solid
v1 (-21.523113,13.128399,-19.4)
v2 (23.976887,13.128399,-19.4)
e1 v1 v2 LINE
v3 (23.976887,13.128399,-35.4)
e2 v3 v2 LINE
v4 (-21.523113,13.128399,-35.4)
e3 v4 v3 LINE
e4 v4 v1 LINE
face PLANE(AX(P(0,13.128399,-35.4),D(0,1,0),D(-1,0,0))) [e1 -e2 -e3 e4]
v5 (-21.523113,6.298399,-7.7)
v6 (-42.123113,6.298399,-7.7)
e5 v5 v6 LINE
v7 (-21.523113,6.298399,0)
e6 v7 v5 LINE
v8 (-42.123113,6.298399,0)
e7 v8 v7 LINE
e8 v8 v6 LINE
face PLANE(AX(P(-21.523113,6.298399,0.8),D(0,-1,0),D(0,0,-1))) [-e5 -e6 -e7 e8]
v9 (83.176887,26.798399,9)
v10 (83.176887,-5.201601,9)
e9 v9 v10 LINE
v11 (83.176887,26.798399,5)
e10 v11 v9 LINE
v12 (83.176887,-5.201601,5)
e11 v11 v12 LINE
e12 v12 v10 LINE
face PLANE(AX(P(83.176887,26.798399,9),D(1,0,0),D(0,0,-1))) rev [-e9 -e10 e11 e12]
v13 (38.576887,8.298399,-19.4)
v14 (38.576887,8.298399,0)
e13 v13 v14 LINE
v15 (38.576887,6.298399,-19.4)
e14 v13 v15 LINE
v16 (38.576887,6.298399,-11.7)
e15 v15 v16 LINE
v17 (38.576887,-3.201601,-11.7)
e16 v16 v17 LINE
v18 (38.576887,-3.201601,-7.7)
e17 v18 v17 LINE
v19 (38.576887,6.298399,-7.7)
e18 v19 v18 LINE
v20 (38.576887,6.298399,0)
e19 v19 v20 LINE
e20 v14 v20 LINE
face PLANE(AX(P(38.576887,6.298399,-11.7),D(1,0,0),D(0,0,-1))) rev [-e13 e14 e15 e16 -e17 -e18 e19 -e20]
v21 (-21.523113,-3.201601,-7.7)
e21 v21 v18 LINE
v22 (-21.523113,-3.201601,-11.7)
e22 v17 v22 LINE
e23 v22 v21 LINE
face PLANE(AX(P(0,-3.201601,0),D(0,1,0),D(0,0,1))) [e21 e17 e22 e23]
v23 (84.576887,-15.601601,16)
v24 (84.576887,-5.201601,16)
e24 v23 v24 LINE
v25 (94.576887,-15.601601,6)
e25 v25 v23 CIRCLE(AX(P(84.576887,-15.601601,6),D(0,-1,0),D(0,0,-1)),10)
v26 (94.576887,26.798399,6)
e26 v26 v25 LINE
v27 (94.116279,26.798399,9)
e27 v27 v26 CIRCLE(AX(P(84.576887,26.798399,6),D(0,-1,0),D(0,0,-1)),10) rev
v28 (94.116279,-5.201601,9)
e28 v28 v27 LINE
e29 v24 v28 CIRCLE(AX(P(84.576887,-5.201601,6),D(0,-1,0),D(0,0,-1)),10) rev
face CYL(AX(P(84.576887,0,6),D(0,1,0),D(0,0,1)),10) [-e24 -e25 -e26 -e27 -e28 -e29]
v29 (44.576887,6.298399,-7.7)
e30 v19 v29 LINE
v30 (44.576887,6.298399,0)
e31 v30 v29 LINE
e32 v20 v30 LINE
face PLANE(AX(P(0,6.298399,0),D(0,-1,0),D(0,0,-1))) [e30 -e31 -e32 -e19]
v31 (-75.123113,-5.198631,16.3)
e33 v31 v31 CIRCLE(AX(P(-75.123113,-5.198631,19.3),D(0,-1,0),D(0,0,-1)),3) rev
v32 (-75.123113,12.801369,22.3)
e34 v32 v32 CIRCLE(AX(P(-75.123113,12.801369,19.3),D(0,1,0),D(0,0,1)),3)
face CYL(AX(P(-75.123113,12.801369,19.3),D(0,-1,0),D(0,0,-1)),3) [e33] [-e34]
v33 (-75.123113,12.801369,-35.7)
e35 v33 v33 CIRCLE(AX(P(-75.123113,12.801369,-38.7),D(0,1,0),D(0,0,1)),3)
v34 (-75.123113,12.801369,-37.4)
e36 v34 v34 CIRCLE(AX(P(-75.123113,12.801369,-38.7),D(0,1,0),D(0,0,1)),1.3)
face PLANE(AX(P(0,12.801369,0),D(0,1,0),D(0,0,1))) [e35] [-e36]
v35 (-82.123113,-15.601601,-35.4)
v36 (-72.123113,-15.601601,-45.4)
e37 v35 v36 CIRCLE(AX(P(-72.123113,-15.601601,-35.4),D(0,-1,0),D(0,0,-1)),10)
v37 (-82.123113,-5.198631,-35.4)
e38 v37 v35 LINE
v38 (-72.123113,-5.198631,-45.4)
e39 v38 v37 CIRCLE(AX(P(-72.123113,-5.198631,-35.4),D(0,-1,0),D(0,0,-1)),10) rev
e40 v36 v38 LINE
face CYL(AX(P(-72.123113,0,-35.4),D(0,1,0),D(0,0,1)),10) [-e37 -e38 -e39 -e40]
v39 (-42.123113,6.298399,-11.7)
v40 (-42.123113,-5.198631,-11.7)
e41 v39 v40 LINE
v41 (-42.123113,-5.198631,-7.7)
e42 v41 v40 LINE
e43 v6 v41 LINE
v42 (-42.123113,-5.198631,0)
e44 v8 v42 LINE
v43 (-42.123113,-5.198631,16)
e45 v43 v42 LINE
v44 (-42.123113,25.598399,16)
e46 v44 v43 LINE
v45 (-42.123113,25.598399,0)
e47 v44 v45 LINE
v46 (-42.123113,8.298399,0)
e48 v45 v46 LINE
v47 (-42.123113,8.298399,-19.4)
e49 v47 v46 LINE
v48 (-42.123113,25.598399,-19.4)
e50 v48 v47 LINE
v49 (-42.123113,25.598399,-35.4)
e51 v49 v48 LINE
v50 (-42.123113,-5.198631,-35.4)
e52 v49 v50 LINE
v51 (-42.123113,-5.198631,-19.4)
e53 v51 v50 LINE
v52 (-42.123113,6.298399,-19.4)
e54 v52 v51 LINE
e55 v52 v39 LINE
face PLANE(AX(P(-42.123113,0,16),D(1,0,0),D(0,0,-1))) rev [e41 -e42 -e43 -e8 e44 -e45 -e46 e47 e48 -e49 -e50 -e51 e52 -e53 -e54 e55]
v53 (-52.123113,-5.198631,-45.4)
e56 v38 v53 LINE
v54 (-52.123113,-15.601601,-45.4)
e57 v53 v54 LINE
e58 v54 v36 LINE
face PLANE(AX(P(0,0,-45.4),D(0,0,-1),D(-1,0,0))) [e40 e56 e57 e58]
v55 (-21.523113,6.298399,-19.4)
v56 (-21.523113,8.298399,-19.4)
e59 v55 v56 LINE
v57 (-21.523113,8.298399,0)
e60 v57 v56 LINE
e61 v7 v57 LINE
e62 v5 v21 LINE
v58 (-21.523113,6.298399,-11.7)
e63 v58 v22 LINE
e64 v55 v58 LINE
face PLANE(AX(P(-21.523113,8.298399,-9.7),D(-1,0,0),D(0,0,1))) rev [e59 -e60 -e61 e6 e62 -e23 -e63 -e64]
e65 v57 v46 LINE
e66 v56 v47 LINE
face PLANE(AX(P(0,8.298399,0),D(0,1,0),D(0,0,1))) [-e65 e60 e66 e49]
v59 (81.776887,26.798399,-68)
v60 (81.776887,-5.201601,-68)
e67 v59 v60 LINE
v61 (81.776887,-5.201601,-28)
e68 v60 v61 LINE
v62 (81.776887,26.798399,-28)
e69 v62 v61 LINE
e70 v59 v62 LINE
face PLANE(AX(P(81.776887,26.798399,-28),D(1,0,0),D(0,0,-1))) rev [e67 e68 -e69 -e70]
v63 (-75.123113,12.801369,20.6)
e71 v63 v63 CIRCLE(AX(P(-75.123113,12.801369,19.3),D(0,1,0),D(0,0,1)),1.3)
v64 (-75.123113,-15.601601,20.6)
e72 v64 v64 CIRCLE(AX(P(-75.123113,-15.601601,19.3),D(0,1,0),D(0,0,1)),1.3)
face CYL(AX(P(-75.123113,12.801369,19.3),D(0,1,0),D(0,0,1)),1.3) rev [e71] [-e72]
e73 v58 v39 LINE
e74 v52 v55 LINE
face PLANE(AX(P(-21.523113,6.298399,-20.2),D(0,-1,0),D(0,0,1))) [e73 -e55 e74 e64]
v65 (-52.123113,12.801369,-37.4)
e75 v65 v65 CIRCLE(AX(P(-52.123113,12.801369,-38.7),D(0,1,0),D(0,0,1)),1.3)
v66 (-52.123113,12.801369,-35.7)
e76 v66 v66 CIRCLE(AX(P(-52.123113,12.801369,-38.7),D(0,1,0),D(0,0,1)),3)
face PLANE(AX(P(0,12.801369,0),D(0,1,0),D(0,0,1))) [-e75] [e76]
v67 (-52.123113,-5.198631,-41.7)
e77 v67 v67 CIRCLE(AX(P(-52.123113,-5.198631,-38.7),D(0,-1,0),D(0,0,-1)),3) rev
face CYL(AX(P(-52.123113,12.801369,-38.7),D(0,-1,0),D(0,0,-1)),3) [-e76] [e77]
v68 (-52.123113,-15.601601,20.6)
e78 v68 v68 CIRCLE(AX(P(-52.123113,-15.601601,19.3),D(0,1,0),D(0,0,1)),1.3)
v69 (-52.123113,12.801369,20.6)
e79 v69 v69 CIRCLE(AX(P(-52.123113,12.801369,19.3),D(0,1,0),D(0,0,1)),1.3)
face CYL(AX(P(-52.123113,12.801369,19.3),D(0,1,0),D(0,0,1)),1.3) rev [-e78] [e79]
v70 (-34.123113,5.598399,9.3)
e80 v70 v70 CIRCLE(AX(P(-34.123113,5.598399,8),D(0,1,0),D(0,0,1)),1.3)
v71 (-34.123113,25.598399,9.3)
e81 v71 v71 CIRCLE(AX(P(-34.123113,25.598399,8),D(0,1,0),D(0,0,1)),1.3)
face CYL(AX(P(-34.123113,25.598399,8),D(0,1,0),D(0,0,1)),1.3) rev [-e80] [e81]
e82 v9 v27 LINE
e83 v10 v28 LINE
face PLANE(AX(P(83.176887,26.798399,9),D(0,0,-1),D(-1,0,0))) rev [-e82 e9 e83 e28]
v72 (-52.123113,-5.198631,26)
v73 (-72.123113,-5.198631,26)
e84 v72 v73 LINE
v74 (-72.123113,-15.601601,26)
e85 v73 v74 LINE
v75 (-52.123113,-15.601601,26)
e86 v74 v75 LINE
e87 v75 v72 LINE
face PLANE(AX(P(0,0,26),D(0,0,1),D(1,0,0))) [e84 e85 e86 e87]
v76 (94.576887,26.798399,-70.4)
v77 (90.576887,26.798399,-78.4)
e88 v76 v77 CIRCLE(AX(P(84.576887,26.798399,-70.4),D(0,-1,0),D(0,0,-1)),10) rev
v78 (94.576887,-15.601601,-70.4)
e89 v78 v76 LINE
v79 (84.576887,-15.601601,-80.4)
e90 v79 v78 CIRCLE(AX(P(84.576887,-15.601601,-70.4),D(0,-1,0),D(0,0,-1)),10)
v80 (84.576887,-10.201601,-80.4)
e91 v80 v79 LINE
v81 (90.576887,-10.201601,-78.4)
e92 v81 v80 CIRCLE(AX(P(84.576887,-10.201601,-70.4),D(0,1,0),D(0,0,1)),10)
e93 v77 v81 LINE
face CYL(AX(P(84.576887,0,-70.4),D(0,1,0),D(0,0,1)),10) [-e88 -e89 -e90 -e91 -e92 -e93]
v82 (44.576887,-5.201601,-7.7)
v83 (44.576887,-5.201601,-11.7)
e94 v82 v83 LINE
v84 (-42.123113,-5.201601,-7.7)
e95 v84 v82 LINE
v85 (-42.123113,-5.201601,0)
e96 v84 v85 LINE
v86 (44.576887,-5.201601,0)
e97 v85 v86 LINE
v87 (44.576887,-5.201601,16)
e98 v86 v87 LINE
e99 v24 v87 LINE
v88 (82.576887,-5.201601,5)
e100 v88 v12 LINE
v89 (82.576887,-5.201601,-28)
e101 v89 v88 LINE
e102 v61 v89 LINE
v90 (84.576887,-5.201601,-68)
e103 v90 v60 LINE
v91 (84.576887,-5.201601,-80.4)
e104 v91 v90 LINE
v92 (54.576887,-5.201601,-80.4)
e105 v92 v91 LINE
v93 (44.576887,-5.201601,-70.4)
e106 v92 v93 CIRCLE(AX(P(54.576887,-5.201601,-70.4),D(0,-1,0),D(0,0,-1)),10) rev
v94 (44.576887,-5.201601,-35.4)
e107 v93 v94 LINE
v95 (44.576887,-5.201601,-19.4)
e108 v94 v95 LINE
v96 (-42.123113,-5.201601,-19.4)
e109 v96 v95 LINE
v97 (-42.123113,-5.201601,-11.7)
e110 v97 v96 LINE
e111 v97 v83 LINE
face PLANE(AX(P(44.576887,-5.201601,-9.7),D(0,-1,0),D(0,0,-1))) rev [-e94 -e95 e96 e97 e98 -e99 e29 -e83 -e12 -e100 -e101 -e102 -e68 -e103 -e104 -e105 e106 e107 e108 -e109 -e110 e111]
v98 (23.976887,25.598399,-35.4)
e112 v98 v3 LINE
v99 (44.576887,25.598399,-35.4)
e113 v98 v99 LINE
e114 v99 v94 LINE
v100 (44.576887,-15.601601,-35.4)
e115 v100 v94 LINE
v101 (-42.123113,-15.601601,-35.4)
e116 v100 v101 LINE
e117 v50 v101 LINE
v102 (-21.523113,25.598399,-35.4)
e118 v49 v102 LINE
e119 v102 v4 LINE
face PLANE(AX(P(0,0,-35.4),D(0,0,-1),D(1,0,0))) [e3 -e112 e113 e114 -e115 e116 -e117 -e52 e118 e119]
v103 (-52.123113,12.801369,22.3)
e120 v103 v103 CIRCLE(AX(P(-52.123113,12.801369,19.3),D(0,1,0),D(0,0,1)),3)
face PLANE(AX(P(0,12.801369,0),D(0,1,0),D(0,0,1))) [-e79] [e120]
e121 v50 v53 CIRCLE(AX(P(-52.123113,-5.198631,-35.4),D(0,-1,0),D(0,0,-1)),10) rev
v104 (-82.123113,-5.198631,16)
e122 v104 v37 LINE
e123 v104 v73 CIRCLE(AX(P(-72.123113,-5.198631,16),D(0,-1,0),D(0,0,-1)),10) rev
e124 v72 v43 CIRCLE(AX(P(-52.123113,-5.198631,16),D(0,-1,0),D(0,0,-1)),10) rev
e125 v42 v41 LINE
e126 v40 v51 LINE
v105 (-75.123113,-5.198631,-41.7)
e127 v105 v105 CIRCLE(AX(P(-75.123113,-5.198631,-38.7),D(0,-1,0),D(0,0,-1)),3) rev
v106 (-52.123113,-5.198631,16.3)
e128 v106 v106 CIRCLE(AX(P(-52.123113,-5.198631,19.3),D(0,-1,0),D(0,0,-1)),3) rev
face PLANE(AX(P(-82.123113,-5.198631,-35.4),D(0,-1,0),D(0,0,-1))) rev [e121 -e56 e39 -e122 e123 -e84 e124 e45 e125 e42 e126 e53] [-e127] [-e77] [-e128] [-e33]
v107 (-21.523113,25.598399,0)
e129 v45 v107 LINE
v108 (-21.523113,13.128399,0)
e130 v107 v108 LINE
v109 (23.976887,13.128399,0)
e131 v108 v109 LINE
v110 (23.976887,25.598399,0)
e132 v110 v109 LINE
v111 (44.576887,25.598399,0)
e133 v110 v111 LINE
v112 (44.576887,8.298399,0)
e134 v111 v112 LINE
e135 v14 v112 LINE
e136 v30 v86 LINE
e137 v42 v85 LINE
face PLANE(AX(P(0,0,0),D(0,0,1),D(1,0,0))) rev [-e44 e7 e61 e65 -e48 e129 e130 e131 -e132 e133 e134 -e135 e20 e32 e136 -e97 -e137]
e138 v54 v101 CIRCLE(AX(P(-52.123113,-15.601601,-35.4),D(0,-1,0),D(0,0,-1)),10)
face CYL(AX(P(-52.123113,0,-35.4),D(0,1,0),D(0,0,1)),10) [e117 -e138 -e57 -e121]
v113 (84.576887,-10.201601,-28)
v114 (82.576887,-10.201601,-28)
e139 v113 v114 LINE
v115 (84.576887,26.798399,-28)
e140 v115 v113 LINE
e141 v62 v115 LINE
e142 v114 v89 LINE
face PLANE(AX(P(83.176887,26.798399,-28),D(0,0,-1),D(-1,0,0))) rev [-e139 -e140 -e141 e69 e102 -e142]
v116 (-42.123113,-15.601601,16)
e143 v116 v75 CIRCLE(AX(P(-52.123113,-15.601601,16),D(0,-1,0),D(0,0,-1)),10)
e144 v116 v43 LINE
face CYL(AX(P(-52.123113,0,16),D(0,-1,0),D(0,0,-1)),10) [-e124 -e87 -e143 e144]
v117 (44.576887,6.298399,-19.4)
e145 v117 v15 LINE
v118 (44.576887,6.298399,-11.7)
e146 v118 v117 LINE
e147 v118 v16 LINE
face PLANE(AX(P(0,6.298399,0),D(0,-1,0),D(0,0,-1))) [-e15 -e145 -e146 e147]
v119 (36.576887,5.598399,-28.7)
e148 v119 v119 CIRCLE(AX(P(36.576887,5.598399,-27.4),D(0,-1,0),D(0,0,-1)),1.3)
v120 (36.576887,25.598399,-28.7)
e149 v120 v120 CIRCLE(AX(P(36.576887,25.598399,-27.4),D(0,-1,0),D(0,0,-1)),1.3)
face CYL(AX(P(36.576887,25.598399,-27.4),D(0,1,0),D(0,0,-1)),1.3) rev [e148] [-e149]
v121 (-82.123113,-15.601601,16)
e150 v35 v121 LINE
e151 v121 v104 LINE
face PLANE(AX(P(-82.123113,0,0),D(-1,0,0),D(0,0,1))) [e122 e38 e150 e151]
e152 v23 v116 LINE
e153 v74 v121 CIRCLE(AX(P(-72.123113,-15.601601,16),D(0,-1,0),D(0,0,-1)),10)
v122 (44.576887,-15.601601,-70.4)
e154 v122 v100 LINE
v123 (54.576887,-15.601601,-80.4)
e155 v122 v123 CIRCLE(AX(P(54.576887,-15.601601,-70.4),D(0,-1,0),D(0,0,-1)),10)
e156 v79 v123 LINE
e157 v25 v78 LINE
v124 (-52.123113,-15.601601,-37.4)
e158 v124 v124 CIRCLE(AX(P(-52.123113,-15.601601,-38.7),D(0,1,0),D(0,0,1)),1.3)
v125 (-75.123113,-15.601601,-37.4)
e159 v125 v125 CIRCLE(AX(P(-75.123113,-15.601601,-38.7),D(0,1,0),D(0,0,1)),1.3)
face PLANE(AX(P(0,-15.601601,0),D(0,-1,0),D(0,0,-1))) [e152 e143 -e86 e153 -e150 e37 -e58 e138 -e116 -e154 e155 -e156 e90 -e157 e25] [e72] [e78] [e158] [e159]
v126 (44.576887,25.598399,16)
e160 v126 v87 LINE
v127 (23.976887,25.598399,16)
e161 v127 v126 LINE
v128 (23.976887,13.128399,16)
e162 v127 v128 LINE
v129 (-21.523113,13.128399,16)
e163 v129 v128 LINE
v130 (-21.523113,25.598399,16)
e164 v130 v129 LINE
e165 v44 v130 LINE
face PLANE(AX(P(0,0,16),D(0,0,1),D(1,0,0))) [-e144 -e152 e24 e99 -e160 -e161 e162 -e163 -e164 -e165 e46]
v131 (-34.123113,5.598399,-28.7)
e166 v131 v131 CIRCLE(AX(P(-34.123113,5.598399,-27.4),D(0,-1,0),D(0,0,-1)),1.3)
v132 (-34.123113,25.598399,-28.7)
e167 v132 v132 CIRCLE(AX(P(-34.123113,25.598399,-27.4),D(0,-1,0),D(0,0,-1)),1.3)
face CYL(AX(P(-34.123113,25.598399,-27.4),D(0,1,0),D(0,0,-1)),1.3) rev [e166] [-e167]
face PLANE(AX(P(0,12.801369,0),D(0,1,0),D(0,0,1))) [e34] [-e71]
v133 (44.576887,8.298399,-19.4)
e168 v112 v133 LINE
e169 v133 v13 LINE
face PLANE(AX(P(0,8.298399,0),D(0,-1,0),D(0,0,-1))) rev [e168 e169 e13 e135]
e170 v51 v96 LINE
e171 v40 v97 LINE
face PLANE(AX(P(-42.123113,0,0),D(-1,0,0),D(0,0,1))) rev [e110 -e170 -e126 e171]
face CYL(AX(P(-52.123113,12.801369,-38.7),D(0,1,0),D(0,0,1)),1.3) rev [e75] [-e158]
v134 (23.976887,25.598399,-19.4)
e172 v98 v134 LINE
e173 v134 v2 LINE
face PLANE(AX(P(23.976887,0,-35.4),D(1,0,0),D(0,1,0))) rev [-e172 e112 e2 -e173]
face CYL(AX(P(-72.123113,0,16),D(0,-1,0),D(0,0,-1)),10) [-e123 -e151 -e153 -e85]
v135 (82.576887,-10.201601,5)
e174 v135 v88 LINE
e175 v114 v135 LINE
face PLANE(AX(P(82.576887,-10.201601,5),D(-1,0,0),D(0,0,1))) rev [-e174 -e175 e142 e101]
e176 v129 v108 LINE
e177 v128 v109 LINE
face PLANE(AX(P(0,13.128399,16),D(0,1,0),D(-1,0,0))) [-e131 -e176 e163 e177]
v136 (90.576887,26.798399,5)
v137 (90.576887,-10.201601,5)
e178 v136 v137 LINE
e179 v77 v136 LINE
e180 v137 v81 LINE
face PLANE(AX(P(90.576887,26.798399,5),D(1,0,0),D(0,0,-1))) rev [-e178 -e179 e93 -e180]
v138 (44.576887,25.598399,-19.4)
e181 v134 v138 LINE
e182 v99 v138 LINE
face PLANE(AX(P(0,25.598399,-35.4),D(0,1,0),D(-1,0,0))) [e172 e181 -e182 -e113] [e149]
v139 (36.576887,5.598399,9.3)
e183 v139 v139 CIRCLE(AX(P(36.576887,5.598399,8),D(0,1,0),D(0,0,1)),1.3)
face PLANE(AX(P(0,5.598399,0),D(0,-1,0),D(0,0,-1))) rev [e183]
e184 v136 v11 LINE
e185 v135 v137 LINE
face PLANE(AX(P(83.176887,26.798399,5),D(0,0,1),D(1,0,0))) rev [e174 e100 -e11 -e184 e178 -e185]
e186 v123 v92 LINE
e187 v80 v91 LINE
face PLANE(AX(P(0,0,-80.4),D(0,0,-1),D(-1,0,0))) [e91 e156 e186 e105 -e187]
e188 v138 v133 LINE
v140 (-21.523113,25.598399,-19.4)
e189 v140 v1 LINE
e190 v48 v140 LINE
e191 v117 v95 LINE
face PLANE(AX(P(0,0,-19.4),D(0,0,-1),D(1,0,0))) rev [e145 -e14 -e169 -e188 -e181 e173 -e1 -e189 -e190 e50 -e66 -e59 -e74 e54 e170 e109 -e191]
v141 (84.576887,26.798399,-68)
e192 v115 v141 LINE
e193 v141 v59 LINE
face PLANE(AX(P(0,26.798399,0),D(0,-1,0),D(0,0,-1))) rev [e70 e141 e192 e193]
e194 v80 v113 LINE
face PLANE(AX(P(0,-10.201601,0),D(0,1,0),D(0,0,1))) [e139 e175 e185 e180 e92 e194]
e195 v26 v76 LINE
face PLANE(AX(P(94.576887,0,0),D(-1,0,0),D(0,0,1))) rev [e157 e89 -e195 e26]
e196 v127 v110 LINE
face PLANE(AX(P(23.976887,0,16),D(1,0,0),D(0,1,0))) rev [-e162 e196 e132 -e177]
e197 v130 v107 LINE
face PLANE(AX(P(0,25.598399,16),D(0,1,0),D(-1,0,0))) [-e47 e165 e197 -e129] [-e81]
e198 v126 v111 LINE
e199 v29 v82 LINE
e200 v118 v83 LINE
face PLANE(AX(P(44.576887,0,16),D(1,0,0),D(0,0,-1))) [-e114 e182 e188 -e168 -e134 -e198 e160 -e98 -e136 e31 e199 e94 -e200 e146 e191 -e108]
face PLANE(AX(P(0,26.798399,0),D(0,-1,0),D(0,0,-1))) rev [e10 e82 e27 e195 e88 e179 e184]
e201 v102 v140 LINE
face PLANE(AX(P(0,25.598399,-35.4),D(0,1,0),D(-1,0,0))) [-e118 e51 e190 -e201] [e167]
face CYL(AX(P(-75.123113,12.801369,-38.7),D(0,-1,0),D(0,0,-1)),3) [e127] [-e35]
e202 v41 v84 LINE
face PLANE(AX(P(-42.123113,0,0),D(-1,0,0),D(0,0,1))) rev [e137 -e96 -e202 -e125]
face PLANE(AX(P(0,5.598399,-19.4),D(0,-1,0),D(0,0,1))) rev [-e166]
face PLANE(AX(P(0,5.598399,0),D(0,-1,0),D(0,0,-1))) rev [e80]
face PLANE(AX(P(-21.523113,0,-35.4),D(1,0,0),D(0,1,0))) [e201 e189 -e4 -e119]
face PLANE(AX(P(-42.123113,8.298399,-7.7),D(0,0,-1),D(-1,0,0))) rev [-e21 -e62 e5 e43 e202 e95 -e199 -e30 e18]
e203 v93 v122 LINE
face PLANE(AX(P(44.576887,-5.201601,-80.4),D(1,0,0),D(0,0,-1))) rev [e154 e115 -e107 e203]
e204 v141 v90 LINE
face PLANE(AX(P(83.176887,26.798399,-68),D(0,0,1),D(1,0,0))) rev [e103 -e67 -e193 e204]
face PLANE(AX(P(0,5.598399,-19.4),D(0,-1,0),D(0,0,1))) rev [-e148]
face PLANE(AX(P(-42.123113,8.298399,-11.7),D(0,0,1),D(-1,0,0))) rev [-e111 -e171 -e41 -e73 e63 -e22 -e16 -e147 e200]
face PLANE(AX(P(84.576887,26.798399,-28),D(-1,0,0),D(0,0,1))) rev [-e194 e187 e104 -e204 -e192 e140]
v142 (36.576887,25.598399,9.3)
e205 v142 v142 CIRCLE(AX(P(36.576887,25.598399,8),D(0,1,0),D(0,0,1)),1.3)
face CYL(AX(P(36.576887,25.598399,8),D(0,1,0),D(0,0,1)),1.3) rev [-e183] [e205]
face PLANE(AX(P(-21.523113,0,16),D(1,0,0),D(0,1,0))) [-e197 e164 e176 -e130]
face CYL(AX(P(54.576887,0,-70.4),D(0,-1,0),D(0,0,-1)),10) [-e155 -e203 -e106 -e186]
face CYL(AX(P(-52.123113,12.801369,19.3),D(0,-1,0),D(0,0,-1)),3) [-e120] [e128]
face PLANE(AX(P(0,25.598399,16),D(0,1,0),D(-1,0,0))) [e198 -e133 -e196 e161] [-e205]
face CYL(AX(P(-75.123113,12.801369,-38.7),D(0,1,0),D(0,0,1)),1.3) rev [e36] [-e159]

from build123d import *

# Parameters (mm, degrees)
EXTRUDE_1_DEPTH     = 16
F_1_0MM_1_D         = 2.6
F_1_0MM_2_D         = 2.6
SKETCH_8_W          = 86.7
SKETCH_8_H          = 16
EXTRUDE_2_DEPTH     = 21.2
SKETCH_9_W          = 86.7
SKETCH_9_H          = 10.4
EXTRUDE_3_DEPTH     = 9.7
SKETCH_15_W         = 20.6
SKETCH_15_H         = 2
EXTRUDE_8_DEPTH     = 13.5
SKETCH_16_W         = 20.6
SKETCH_16_H         = 2
EXTRUDE_9_DEPTH     = 10.5
SKETCH_19_W         = 51.4
SKETCH_19_H         = 10.4
EXTRUDE_10_DEPTH    = 50
SKETCH_25_W         = 50
SKETCH_25_H         = 10.4
EXTRUDE_11_DEPTH    = 45
EXTRUDE_12_DEPTH    = 32
CUT_EXTRUDE_1_DEPTH = 5
SKETCH_29_W         = 51.4
SKETCH_29_H         = 10.402970243
EXTRUDE_13_DEPTH    = 40
SKETCH_32_W         = 40
SKETCH_32_H         = 10.402970243
EXTRUDE_14_DEPTH    = 10
SKETCH_33_W         = 40
SKETCH_33_H         = 10.402970243
EXTRUDE_15_DEPTH    = 10
SKETCH_34_R         = 3
EXTRUDE_16_DEPTH    = 18
F_1_0MM_3_D         = 2.6
F_1_0MM_4_D         = 2.6
FILLET_1_R          = 10
FILLET_2_R          = 10
SKETCH_40_W         = 6
SKETCH_40_H         = 4
EXTRUDE_17_DEPTH    = 11.5
SKETCH_42_W         = 6
SKETCH_42_H         = 19.4
EXTRUDE_18_DEPTH    = 2
SKETCH_46_W         = 60.1
SKETCH_46_H         = 4
EXTRUDE_19_DEPTH    = 2


with BuildPart() as part:
    # 草图1 → 凸台-拉伸1 (new body)
    with BuildSketch(Plane.XY):
        Polygon((-21.523113208, 25.59839861), (-42.123113208, 25.59839861), (-42.123113208, 5.59839861), (44.576886792, 5.59839861), (44.576886792, 25.59839861), (23.976886792, 25.59839861), (23.976886792, 13.12839861), (-21.523113208, 13.12839861), align=None)
    extrude_1 = extrude(amount=EXTRUDE_1_DEPTH)

    # Ø1.0mm 暗销孔1 (through all)
    with Locations(Plane(origin=(0, 25.59839861, 0), x_dir=(1, 0, 0), z_dir=(0, 1, 0))):
        with Locations((36.576886792, -8)):
            f_1_0mm_1 = Hole(F_1_0MM_1_D / 2)

    # Ø1.0mm 暗销孔2 (through all)
    with Locations(Plane(origin=(0, 25.59839861, 0), x_dir=(1, 0, 0), z_dir=(0, 1, 0))):
        with Locations((-34.123113208, -8)):
            f_1_0mm_2 = Hole(F_1_0MM_2_D / 2)

    # 草图8 → 凸台-拉伸2 (add)
    with BuildSketch(Plane.XZ.offset(-5.59839861)):
        with Locations((1.226886792, 8)):
            Rectangle(SKETCH_8_W, SKETCH_8_H)
    extrude_2 = extrude(amount=EXTRUDE_2_DEPTH)

    # 草图9 → 凸台-拉伸3 (add)
    with BuildSketch(Plane(origin=(0, 0, 0), x_dir=(-1, 0, 0), z_dir=(0, 0, -1))):
        with Locations((-1.226886792, -10.40160139)):
            Rectangle(SKETCH_9_W, SKETCH_9_H)
    extrude_3 = extrude(amount=EXTRUDE_3_DEPTH)

    # 草图15 → 凸台-拉伸8 (add)
    with BuildSketch(Plane(origin=(0, -5.20160139, 0), x_dir=(1, 0, 0), z_dir=(0, 1, 0))):
        with Locations((-31.823113208, 8.7)):
            Rectangle(SKETCH_15_W, SKETCH_15_H)
    extrude_8 = extrude(amount=EXTRUDE_8_DEPTH)

    # 草图16 → 凸台-拉伸9 (add)
    with BuildSketch(Plane(origin=(0, 0, -9.7), x_dir=(-1, 0, 0), z_dir=(0, 0, -1))):
        with Locations((31.823113208, 7.29839861)):
            Rectangle(SKETCH_16_W, SKETCH_16_H)
    extrude_9 = extrude(amount=-EXTRUDE_9_DEPTH)

    # 镜向20: 凸台-拉伸1, Ø1.0mm 暗销孔1, Ø1.0mm 暗销孔2, 凸台-拉伸2, 凸台-拉伸3, 凸台-拉伸8, 凸台-拉伸9 across plane
    add(extrude_1.mirror(Plane.XY.offset(-9.7)))
    add(f_1_0mm_1.mirror(Plane.XY.offset(-9.7)), mode=Mode.SUBTRACT)
    add(f_1_0mm_2.mirror(Plane.XY.offset(-9.7)), mode=Mode.SUBTRACT)
    add(extrude_2.mirror(Plane.XY.offset(-9.7)))
    add(extrude_3.mirror(Plane.XY.offset(-9.7)))
    add(extrude_8.mirror(Plane.XY.offset(-9.7)))
    add(extrude_9.mirror(Plane.XY.offset(-9.7)))

    # 草图19 → 凸台-拉伸10 (add)
    with BuildSketch(Plane(origin=(44.576886792, 0, 0), x_dir=(0, 0, -1), z_dir=(1, 0, 0))):
        with Locations((9.7, -10.40160139)):
            Rectangle(SKETCH_19_W, SKETCH_19_H)
    extrude(amount=EXTRUDE_10_DEPTH)

    # 草图25 → 凸台-拉伸11 (add)
    with BuildSketch(Plane(origin=(0, 0, -35.4), x_dir=(-1, 0, 0), z_dir=(0, 0, -1))):
        with Locations((-69.576886792, -10.40160139)):
            Rectangle(SKETCH_25_W, SKETCH_25_H)
    extrude(amount=EXTRUDE_11_DEPTH)

    # 草图26 → 凸台-拉伸12 (add)
    with BuildSketch(Plane(origin=(0, -5.20160139, 0), x_dir=(1, 0, 0), z_dir=(0, 1, 0))):
        Polygon((83.176886792, -9), (94.576886792, -9), (94.576886792, -5), (94.576886792, 80.4), (90.576886792, 80.4), (90.576886792, -5), (83.176886792, -5), align=None)
        Polygon((83.176886792, 28), (84.576886792, 28), (84.576886792, 68), (83.176886792, 68), (81.776886792, 68), (81.776886792, 28), align=None)
    extrude(amount=EXTRUDE_12_DEPTH)

    # 草图28 → 切除-拉伸1 (cut)
    with BuildSketch(Plane(origin=(0, -5.20160139, 0), x_dir=(1, 0, 0), z_dir=(0, 1, 0))):
        Polygon((90.576886792, -5), (84.576886792, -5), (82.576886792, -5), (82.576886792, 28), (84.576886792, 28), (84.576886792, 80.4), (90.576886792, 80.4), align=None)
    extrude(amount=-CUT_EXTRUDE_1_DEPTH, mode=Mode.SUBTRACT)

    # 草图29 → 凸台-拉伸13 (add)
    with BuildSketch(Plane.ZY.offset(42.123113208)):
        with Locations((-9.7, -10.400116268)):
            Rectangle(SKETCH_29_W, SKETCH_29_H)
    extrude(amount=EXTRUDE_13_DEPTH)

    # 草图32 → 凸台-拉伸14 (add)
    with BuildSketch(Plane(origin=(0, 0, -35.4), x_dir=(-1, 0, 0), z_dir=(0, 0, -1))):
        with Locations((62.123113208, -10.400116268)):
            Rectangle(SKETCH_32_W, SKETCH_32_H)
    extrude(amount=EXTRUDE_14_DEPTH)

    # 草图33 → 凸台-拉伸15 (add)
    with BuildSketch(Plane.XY.offset(16)):
        with Locations((-62.123113208, -10.400116268)):
            Rectangle(SKETCH_33_W, SKETCH_33_H)
    extrude(amount=EXTRUDE_15_DEPTH)

    # 草图34 → 凸台-拉伸16 (add)
    with BuildSketch(Plane(origin=(0, -5.198631147, 0), x_dir=(1, 0, 0), z_dir=(0, 1, 0))):
        with Locations(Location((-52.123113208, 38.7, 0), (0, 0, 90))):
            Circle(SKETCH_34_R)
        with Locations(Location((-75.123113208, 38.7, 0), (0, 0, 90))):
            Circle(SKETCH_34_R)
        with Locations(Location((-52.123113208, -19.3, 0), (0, 0, 90))):
            Circle(SKETCH_34_R)
        with Locations(Location((-75.123113208, -19.3, 0), (0, 0, 90))):
            Circle(SKETCH_34_R)
    extrude(amount=EXTRUDE_16_DEPTH)

    # Ø1.0mm 暗销孔3 (through all)
    with Locations(Plane(origin=(0, 12.801368853, 0), x_dir=(1, 0, 0), z_dir=(0, 1, 0))):
        with Locations((-52.123113208, 38.7)):
            Hole(F_1_0MM_3_D / 2)

    # Ø1.0mm 暗销孔4 (through all)
    with Locations(Plane(origin=(0, 12.801368853, 0), x_dir=(1, 0, 0), z_dir=(0, 1, 0))):
        with Locations((-52.123113208, -19.3), (-75.123113208, 38.7), (-75.123113208, -19.3)):
            Hole(F_1_0MM_4_D / 2)

    # 圆角1
    fillet_1_edges = [part.edges().sort_by_distance(p)[0] for p in [
        (44.576886792, -10.40160139, -80.4),
        (94.576886792, -10.40160139, 16),
        (-42.123113208, -10.400116268, -45.4),
        (-42.123113208, -10.400116268, 26),
        (-82.123113208, -10.400116268, -45.4),
        (-82.123113208, -10.400116268, 26),
    ]]
    fillet(fillet_1_edges, radius=FILLET_1_R - 0.0001)  # a hair under: the kernel refuses the full size

    # 圆角2
    fillet_2_edges = [part.edges().sort_by_distance(p)[0] for p in [
        (94.576886792, 5.59839861, -80.4),
    ]]
    fillet(fillet_2_edges, radius=FILLET_2_R - 0.0001)  # a hair under: the kernel refuses the full size

    # 草图40 → 凸台-拉伸17 (add)
    with BuildSketch(Plane(origin=(0, -5.20160139, 0), x_dir=(1, 0, 0), z_dir=(0, 1, 0))):
        with Locations((41.576886792, 9.7)):
            Rectangle(SKETCH_40_W, SKETCH_40_H)
    extrude(amount=EXTRUDE_17_DEPTH)

    # 草图42 → 凸台-拉伸18 (add)
    with BuildSketch(Plane(origin=(0, 6.29839861, 0), x_dir=(1, 0, 0), z_dir=(0, 1, 0))):
        with Locations((41.576886792, 9.7)):
            Rectangle(SKETCH_42_W, SKETCH_42_H)
    extrude(amount=EXTRUDE_18_DEPTH)

    # 草图46 → 凸台-拉伸19 (add)
    with BuildSketch(Plane(origin=(0, -5.20160139, 0), x_dir=(1, 0, 0), z_dir=(0, 1, 0))):
        with Locations((8.526886792, 9.7)):
            Rectangle(SKETCH_46_W, SKETCH_46_H)
    extrude(amount=EXTRUDE_19_DEPTH)


solid = part.part
